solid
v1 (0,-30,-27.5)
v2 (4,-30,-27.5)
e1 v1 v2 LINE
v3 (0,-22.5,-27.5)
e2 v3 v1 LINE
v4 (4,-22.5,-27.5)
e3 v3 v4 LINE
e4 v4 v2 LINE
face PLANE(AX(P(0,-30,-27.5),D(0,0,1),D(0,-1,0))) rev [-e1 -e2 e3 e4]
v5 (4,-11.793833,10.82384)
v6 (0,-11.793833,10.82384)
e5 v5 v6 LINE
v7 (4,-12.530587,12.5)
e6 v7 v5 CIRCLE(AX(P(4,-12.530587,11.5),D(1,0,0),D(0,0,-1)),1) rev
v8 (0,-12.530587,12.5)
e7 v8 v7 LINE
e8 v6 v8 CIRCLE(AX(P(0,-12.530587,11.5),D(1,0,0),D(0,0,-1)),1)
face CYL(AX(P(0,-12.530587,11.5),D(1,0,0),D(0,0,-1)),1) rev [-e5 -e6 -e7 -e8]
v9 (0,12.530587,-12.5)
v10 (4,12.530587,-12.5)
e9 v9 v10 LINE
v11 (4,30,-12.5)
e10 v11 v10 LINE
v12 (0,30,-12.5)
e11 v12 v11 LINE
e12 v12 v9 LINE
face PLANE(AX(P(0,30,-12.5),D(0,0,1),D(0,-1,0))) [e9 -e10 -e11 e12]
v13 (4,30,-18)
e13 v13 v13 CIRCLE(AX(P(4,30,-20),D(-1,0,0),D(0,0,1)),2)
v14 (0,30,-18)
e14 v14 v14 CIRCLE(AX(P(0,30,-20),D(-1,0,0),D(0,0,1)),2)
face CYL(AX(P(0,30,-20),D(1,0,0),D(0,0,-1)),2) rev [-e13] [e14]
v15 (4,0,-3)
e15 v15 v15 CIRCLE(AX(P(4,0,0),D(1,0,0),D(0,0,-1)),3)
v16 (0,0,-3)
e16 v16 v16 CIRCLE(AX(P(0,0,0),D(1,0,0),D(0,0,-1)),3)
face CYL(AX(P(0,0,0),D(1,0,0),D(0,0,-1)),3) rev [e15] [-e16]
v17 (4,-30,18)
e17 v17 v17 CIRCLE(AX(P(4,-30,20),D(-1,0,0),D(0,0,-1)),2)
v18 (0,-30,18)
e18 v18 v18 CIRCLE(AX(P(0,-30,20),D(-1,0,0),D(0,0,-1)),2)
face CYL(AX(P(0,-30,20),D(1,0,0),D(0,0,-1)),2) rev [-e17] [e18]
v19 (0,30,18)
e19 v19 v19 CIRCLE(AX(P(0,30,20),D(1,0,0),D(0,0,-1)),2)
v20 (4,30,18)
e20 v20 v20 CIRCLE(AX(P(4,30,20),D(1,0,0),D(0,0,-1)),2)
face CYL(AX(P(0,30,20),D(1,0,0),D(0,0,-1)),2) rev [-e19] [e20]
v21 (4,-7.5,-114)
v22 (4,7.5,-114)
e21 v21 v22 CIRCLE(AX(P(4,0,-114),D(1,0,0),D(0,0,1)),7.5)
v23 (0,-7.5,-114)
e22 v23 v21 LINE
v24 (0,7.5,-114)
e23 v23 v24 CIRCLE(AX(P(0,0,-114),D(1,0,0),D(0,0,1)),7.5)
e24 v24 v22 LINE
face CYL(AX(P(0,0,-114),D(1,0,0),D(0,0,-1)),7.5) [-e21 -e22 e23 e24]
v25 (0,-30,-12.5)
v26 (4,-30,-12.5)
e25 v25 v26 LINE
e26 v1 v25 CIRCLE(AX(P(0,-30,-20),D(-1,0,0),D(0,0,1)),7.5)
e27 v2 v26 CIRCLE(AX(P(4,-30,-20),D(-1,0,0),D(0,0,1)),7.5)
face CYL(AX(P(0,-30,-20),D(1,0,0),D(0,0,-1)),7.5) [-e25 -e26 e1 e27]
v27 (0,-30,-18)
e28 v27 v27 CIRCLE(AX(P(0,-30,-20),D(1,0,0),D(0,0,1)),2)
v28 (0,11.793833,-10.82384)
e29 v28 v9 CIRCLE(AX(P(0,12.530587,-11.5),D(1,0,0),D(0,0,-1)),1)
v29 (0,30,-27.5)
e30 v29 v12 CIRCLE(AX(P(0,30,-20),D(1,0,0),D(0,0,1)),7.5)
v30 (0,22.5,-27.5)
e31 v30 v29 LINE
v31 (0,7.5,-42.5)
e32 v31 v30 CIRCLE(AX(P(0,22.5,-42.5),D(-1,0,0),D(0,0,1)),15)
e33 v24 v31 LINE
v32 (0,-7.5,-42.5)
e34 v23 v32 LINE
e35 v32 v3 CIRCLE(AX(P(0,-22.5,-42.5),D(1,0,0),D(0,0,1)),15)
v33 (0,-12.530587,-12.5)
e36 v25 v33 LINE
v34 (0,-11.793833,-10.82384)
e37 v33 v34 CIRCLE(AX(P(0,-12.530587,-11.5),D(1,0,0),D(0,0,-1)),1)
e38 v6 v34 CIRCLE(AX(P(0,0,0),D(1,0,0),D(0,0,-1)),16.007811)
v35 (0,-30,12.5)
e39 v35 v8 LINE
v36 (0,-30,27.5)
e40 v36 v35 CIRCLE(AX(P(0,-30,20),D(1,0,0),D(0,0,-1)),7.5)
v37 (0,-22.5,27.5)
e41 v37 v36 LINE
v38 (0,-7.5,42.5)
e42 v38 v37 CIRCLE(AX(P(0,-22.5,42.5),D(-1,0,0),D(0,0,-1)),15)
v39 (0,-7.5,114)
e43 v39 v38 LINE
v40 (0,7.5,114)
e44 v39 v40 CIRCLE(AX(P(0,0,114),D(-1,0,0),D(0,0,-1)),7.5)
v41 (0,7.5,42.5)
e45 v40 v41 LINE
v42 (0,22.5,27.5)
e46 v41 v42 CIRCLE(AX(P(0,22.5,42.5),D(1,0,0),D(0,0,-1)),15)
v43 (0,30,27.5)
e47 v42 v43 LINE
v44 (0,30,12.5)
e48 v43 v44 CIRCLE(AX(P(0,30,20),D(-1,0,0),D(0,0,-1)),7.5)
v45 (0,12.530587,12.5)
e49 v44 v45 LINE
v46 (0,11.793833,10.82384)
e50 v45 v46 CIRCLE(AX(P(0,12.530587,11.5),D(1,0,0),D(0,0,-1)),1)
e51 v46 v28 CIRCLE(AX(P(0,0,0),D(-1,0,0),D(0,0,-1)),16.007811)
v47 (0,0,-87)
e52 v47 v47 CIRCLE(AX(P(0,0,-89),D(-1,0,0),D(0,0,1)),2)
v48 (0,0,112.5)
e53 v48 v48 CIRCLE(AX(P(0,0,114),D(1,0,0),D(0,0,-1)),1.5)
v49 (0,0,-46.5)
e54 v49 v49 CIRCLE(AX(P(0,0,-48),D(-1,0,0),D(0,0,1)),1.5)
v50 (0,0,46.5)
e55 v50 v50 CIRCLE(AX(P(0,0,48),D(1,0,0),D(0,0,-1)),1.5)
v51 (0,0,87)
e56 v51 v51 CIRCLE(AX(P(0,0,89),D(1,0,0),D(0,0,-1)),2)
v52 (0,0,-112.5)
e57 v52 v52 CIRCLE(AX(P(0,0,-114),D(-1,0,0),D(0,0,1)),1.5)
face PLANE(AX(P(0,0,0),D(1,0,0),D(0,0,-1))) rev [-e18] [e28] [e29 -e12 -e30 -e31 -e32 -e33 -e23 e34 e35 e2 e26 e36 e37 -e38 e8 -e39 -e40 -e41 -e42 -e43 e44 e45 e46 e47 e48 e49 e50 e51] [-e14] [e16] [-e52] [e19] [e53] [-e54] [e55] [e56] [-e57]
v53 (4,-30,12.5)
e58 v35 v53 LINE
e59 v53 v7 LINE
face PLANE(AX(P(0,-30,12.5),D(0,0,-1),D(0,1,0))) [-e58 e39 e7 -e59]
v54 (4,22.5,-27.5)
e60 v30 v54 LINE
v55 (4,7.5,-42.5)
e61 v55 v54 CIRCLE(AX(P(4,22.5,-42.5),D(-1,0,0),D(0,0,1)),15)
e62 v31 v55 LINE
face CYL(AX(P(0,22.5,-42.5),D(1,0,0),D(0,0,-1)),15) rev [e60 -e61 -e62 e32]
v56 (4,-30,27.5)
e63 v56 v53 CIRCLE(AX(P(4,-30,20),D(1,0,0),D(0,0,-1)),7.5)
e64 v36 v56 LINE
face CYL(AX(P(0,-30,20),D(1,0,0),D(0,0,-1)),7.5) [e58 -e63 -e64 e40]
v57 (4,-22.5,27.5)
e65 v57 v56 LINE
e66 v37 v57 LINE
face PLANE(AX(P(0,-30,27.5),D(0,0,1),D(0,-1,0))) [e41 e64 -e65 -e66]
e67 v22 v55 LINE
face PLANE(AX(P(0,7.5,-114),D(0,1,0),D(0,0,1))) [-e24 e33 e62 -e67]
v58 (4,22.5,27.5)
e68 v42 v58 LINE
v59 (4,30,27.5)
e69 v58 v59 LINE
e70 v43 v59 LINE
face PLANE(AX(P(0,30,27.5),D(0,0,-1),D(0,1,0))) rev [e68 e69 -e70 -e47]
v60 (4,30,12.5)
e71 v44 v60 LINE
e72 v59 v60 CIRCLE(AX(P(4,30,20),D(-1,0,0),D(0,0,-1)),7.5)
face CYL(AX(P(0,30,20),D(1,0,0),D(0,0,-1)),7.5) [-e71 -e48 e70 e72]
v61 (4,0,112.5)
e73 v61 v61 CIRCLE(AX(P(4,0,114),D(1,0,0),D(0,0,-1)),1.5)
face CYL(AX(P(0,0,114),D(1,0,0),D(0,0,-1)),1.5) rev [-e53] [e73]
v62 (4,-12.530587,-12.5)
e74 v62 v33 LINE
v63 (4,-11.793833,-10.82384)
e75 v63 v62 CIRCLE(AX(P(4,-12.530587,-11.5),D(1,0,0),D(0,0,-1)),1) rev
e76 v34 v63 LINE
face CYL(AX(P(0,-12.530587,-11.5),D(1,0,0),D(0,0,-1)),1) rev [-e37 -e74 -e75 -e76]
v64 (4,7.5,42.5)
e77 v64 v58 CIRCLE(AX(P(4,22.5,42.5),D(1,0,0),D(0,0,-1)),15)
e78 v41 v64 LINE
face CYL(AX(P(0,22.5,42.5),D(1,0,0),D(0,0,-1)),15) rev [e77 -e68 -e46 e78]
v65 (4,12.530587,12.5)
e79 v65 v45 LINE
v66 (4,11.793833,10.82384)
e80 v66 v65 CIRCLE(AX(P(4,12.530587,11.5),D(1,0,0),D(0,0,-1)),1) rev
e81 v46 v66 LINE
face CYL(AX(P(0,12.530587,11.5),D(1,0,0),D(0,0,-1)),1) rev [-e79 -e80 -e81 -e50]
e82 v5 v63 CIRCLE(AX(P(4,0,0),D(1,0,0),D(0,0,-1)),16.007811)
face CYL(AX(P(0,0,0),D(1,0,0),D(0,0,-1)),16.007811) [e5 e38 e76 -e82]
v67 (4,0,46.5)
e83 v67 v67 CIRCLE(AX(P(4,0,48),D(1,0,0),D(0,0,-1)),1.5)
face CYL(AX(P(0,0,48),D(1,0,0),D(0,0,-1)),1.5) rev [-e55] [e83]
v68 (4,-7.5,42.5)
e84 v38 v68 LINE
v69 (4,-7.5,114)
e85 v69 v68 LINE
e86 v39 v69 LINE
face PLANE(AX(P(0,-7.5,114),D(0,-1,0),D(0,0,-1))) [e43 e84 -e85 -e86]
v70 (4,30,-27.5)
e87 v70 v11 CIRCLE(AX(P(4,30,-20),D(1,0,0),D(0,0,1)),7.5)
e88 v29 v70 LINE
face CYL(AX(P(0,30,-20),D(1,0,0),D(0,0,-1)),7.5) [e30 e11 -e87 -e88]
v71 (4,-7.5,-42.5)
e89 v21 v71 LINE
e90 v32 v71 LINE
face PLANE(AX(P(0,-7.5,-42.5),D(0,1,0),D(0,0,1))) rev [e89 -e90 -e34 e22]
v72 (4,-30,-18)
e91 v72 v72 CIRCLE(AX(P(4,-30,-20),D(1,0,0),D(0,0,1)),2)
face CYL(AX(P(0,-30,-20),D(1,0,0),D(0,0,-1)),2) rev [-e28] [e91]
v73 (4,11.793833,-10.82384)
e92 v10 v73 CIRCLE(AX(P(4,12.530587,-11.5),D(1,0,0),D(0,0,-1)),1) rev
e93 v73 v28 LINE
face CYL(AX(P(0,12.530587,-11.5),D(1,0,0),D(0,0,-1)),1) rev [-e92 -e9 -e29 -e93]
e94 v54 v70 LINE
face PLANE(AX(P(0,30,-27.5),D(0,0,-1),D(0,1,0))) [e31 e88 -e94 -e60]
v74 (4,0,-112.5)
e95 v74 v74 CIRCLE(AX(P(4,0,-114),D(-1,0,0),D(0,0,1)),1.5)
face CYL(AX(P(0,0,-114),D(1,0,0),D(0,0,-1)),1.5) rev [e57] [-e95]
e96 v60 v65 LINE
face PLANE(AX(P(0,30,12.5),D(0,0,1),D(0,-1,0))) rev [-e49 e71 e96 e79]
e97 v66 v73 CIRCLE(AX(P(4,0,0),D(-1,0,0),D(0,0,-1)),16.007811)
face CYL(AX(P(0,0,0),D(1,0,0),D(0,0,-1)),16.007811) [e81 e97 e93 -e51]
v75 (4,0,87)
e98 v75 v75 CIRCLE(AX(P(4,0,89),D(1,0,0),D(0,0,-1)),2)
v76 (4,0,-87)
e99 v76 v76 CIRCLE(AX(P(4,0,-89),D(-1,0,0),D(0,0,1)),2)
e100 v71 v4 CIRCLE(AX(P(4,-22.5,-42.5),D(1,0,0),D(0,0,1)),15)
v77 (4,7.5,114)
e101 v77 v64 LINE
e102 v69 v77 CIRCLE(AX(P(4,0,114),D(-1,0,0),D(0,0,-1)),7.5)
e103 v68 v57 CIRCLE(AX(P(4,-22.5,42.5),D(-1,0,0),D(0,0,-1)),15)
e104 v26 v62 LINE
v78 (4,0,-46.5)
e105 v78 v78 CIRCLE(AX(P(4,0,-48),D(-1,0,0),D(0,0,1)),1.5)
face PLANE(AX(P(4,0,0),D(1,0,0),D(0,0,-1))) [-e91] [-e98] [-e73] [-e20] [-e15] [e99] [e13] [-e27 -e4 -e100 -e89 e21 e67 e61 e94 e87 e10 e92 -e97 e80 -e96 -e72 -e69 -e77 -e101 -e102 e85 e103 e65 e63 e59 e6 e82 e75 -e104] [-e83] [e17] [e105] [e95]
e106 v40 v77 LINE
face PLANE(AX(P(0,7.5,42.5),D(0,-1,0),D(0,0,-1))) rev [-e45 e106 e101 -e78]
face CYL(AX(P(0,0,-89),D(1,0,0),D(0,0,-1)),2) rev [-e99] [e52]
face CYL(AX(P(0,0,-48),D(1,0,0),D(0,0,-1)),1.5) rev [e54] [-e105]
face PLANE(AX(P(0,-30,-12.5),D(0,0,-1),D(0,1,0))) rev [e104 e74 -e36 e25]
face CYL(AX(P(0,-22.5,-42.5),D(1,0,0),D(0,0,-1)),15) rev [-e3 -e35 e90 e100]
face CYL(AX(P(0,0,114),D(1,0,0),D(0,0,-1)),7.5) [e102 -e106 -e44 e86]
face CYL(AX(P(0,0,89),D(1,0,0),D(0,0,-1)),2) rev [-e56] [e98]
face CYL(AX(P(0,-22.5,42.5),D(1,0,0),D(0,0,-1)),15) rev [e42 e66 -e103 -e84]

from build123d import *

# Parameters (mm, degrees)
SKETCH1_W            = 250
SKETCH1_H            = 90
BOSS_EXTRUDE1_DEPTH  = 4
SKETCH2_R            = 3
SKETCH2_R_2          = 1.5
SKETCH2_R_3          = 2
CUT_EXTRUDE1_DEPTH   = 133.91350571
SKETCH3_R            = 2
CUT_EXTRUDE2_DEPTH   = 133.91350571
CUT_EXTRUDE3_DEPTH   = 133.91350571
FILLET1_R            = 1
FILLET1_OF_MIRROR2_R = 1
MIRROR3_OUTLINE_R    = 1.5
MIRROR3_OUTLINE_R_2  = 2
MIRROR3_DEPTH        = 4


# Read off the part's stored shape, not the designer's step: Mirror3
with BuildPart() as part:
    # Sketch1 → Boss-Extrude1 (new body)
    with BuildSketch(Plane(origin=(0, 0, 0), x_dir=(0, 0, -1), z_dir=(1, 0, 0))):
        Rectangle(SKETCH1_W, SKETCH1_H)
    extrude(amount=BOSS_EXTRUDE1_DEPTH)

    # Sketch2 → Cut-Extrude1 (cut, through all)
    with BuildSketch(Plane(origin=(4, 0, 0), x_dir=(0, 0, -1), z_dir=(1, 0, 0))):
        Circle(SKETCH2_R)
        with Locations((-48, 0)):
            Circle(SKETCH2_R_2)
        with Locations((-89, 0)):
            Circle(SKETCH2_R_3)
        with Locations((-114, 0)):
            Circle(SKETCH2_R_2)
    extrude(amount=-CUT_EXTRUDE1_DEPTH, mode=Mode.SUBTRACT)

    # Sketch3 → Cut-Extrude2 (cut, through all)
    with BuildSketch(Plane(origin=(4, 0, 0), x_dir=(0, 0, -1), z_dir=(1, 0, 0))):
        with Locations((-20, 30)):
            Circle(SKETCH3_R)
    cut_extrude2 = extrude(amount=-CUT_EXTRUDE2_DEPTH, mode=Mode.SUBTRACT)

    # Sketch4 → Cut-Extrude3 (cut, through all)
    with BuildSketch(Plane(origin=(4, 0, 0), x_dir=(0, 0, -1), z_dir=(1, 0, 0))):
        with BuildLine():
            Line((-114, 7.5), (-50, 7.5))
            Line((-50, 7.5), (-42.5, 7.5))
            ThreePointArc((-42.5, 7.5), (-31.893398282, 11.893398282), (-27.5, 22.5))
            Line((-27.5, 22.5), (-27.5, 30))
            ThreePointArc((-27.5, 30), (-20, 37.5), (-12.5, 30))
            Line((-12.5, 30), (-12.5, 10))
            ThreePointArc((-12.5, 10), (-6.934403149, 14.427891494), (0, 16.007810594))
            Line((0, 16.007810594), (0, 45))
            Line((0, 45), (-125, 45))
            Line((-125, 45), (-125, 1.99556796))
            Line((-125, 1.99556796), (-125, 0))
            Line((-125, 0), (-121.5, 0))
            ThreePointArc((-121.5, 0), (-119.303300859, 5.303300859), (-114, 7.5))
        make_face()
    cut_extrude3 = extrude(amount=-CUT_EXTRUDE3_DEPTH, mode=Mode.SUBTRACT)

    # Fillet1
    fillet1_edges = [part.edges().sort_by_distance(p)[0] for p in [
        (2, 10, 12.5),
    ]]
    fillet(fillet1_edges, radius=FILLET1_R)

    # Mirror2: Cut-Extrude2, Cut-Extrude3 across plane
    add(cut_extrude2.mirror(Plane.ZX), mode=Mode.SUBTRACT)
    add(cut_extrude3.mirror(Plane.ZX), mode=Mode.SUBTRACT)

    # Fillet1 of Mirror2
    fillet1_of_mirror2_edges = [part.edges().sort_by_distance(p)[0] for p in [
        (2, -10, 12.5),
    ]]
    fillet(fillet1_of_mirror2_edges, radius=FILLET1_OF_MIRROR2_R)

    # Mirror3 outline → Mirror3 (cut)
    with BuildSketch(Plane.YZ):
        with BuildLine():
            Line((7.5, -42.5), (7.5, -114))
            ThreePointArc((7.5, -114), (0, -121.5), (-7.5, -114))
            Line((-7.5, -114), (-7.5, -42.5))
            ThreePointArc((-7.5, -42.5), (-11.893398282, -31.893398282), (-22.5, -27.5))
            Line((-22.5, -27.5), (-30, -27.5))
            ThreePointArc((-30, -27.5), (-37.5, -20), (-30, -12.5))
            Line((-30, -12.5), (-12.530587424, -12.5))
            ThreePointArc((-12.530587424, -12.5), (-11.615120349, -11.902392887), (-11.793832546, -10.823840071))
            ThreePointArc((-11.793832546, -10.823840071), (-14.917161888, -5.807605463), (-16.007810594, 0))
            Line((-16.007810594, 0), (-45, 0))
            Line((-45, 0), (-45, -125))
            Line((-45, -125), (45, -125))
            Line((45, -125), (45, 0))
            Line((45, 0), (16.007810594, 0))
            ThreePointArc((16.007810594, 0), (14.917161888, -5.807605463), (11.793832546, -10.823840071))
            ThreePointArc((11.793832546, -10.823840071), (11.615120349, -11.902392887), (12.530587424, -12.5))
            Line((12.530587424, -12.5), (30, -12.5))
            ThreePointArc((30, -12.5), (37.5, -20), (30, -27.5))
            Line((30, -27.5), (22.5, -27.5))
            ThreePointArc((22.5, -27.5), (11.893398282, -31.893398282), (7.5, -42.5))
        make_face()
        with Locations((0, -114)):
            Circle(MIRROR3_OUTLINE_R)
        with Locations((0, -89)):
            Circle(MIRROR3_OUTLINE_R_2)
        with Locations((0, -48)):
            Circle(MIRROR3_OUTLINE_R)
        with Locations((30, -20)):
            Circle(MIRROR3_OUTLINE_R_2)
        with Locations((-30, -20)):
            Circle(MIRROR3_OUTLINE_R_2)
    extrude(amount=MIRROR3_DEPTH, mode=Mode.SUBTRACT)


solid = part.part
